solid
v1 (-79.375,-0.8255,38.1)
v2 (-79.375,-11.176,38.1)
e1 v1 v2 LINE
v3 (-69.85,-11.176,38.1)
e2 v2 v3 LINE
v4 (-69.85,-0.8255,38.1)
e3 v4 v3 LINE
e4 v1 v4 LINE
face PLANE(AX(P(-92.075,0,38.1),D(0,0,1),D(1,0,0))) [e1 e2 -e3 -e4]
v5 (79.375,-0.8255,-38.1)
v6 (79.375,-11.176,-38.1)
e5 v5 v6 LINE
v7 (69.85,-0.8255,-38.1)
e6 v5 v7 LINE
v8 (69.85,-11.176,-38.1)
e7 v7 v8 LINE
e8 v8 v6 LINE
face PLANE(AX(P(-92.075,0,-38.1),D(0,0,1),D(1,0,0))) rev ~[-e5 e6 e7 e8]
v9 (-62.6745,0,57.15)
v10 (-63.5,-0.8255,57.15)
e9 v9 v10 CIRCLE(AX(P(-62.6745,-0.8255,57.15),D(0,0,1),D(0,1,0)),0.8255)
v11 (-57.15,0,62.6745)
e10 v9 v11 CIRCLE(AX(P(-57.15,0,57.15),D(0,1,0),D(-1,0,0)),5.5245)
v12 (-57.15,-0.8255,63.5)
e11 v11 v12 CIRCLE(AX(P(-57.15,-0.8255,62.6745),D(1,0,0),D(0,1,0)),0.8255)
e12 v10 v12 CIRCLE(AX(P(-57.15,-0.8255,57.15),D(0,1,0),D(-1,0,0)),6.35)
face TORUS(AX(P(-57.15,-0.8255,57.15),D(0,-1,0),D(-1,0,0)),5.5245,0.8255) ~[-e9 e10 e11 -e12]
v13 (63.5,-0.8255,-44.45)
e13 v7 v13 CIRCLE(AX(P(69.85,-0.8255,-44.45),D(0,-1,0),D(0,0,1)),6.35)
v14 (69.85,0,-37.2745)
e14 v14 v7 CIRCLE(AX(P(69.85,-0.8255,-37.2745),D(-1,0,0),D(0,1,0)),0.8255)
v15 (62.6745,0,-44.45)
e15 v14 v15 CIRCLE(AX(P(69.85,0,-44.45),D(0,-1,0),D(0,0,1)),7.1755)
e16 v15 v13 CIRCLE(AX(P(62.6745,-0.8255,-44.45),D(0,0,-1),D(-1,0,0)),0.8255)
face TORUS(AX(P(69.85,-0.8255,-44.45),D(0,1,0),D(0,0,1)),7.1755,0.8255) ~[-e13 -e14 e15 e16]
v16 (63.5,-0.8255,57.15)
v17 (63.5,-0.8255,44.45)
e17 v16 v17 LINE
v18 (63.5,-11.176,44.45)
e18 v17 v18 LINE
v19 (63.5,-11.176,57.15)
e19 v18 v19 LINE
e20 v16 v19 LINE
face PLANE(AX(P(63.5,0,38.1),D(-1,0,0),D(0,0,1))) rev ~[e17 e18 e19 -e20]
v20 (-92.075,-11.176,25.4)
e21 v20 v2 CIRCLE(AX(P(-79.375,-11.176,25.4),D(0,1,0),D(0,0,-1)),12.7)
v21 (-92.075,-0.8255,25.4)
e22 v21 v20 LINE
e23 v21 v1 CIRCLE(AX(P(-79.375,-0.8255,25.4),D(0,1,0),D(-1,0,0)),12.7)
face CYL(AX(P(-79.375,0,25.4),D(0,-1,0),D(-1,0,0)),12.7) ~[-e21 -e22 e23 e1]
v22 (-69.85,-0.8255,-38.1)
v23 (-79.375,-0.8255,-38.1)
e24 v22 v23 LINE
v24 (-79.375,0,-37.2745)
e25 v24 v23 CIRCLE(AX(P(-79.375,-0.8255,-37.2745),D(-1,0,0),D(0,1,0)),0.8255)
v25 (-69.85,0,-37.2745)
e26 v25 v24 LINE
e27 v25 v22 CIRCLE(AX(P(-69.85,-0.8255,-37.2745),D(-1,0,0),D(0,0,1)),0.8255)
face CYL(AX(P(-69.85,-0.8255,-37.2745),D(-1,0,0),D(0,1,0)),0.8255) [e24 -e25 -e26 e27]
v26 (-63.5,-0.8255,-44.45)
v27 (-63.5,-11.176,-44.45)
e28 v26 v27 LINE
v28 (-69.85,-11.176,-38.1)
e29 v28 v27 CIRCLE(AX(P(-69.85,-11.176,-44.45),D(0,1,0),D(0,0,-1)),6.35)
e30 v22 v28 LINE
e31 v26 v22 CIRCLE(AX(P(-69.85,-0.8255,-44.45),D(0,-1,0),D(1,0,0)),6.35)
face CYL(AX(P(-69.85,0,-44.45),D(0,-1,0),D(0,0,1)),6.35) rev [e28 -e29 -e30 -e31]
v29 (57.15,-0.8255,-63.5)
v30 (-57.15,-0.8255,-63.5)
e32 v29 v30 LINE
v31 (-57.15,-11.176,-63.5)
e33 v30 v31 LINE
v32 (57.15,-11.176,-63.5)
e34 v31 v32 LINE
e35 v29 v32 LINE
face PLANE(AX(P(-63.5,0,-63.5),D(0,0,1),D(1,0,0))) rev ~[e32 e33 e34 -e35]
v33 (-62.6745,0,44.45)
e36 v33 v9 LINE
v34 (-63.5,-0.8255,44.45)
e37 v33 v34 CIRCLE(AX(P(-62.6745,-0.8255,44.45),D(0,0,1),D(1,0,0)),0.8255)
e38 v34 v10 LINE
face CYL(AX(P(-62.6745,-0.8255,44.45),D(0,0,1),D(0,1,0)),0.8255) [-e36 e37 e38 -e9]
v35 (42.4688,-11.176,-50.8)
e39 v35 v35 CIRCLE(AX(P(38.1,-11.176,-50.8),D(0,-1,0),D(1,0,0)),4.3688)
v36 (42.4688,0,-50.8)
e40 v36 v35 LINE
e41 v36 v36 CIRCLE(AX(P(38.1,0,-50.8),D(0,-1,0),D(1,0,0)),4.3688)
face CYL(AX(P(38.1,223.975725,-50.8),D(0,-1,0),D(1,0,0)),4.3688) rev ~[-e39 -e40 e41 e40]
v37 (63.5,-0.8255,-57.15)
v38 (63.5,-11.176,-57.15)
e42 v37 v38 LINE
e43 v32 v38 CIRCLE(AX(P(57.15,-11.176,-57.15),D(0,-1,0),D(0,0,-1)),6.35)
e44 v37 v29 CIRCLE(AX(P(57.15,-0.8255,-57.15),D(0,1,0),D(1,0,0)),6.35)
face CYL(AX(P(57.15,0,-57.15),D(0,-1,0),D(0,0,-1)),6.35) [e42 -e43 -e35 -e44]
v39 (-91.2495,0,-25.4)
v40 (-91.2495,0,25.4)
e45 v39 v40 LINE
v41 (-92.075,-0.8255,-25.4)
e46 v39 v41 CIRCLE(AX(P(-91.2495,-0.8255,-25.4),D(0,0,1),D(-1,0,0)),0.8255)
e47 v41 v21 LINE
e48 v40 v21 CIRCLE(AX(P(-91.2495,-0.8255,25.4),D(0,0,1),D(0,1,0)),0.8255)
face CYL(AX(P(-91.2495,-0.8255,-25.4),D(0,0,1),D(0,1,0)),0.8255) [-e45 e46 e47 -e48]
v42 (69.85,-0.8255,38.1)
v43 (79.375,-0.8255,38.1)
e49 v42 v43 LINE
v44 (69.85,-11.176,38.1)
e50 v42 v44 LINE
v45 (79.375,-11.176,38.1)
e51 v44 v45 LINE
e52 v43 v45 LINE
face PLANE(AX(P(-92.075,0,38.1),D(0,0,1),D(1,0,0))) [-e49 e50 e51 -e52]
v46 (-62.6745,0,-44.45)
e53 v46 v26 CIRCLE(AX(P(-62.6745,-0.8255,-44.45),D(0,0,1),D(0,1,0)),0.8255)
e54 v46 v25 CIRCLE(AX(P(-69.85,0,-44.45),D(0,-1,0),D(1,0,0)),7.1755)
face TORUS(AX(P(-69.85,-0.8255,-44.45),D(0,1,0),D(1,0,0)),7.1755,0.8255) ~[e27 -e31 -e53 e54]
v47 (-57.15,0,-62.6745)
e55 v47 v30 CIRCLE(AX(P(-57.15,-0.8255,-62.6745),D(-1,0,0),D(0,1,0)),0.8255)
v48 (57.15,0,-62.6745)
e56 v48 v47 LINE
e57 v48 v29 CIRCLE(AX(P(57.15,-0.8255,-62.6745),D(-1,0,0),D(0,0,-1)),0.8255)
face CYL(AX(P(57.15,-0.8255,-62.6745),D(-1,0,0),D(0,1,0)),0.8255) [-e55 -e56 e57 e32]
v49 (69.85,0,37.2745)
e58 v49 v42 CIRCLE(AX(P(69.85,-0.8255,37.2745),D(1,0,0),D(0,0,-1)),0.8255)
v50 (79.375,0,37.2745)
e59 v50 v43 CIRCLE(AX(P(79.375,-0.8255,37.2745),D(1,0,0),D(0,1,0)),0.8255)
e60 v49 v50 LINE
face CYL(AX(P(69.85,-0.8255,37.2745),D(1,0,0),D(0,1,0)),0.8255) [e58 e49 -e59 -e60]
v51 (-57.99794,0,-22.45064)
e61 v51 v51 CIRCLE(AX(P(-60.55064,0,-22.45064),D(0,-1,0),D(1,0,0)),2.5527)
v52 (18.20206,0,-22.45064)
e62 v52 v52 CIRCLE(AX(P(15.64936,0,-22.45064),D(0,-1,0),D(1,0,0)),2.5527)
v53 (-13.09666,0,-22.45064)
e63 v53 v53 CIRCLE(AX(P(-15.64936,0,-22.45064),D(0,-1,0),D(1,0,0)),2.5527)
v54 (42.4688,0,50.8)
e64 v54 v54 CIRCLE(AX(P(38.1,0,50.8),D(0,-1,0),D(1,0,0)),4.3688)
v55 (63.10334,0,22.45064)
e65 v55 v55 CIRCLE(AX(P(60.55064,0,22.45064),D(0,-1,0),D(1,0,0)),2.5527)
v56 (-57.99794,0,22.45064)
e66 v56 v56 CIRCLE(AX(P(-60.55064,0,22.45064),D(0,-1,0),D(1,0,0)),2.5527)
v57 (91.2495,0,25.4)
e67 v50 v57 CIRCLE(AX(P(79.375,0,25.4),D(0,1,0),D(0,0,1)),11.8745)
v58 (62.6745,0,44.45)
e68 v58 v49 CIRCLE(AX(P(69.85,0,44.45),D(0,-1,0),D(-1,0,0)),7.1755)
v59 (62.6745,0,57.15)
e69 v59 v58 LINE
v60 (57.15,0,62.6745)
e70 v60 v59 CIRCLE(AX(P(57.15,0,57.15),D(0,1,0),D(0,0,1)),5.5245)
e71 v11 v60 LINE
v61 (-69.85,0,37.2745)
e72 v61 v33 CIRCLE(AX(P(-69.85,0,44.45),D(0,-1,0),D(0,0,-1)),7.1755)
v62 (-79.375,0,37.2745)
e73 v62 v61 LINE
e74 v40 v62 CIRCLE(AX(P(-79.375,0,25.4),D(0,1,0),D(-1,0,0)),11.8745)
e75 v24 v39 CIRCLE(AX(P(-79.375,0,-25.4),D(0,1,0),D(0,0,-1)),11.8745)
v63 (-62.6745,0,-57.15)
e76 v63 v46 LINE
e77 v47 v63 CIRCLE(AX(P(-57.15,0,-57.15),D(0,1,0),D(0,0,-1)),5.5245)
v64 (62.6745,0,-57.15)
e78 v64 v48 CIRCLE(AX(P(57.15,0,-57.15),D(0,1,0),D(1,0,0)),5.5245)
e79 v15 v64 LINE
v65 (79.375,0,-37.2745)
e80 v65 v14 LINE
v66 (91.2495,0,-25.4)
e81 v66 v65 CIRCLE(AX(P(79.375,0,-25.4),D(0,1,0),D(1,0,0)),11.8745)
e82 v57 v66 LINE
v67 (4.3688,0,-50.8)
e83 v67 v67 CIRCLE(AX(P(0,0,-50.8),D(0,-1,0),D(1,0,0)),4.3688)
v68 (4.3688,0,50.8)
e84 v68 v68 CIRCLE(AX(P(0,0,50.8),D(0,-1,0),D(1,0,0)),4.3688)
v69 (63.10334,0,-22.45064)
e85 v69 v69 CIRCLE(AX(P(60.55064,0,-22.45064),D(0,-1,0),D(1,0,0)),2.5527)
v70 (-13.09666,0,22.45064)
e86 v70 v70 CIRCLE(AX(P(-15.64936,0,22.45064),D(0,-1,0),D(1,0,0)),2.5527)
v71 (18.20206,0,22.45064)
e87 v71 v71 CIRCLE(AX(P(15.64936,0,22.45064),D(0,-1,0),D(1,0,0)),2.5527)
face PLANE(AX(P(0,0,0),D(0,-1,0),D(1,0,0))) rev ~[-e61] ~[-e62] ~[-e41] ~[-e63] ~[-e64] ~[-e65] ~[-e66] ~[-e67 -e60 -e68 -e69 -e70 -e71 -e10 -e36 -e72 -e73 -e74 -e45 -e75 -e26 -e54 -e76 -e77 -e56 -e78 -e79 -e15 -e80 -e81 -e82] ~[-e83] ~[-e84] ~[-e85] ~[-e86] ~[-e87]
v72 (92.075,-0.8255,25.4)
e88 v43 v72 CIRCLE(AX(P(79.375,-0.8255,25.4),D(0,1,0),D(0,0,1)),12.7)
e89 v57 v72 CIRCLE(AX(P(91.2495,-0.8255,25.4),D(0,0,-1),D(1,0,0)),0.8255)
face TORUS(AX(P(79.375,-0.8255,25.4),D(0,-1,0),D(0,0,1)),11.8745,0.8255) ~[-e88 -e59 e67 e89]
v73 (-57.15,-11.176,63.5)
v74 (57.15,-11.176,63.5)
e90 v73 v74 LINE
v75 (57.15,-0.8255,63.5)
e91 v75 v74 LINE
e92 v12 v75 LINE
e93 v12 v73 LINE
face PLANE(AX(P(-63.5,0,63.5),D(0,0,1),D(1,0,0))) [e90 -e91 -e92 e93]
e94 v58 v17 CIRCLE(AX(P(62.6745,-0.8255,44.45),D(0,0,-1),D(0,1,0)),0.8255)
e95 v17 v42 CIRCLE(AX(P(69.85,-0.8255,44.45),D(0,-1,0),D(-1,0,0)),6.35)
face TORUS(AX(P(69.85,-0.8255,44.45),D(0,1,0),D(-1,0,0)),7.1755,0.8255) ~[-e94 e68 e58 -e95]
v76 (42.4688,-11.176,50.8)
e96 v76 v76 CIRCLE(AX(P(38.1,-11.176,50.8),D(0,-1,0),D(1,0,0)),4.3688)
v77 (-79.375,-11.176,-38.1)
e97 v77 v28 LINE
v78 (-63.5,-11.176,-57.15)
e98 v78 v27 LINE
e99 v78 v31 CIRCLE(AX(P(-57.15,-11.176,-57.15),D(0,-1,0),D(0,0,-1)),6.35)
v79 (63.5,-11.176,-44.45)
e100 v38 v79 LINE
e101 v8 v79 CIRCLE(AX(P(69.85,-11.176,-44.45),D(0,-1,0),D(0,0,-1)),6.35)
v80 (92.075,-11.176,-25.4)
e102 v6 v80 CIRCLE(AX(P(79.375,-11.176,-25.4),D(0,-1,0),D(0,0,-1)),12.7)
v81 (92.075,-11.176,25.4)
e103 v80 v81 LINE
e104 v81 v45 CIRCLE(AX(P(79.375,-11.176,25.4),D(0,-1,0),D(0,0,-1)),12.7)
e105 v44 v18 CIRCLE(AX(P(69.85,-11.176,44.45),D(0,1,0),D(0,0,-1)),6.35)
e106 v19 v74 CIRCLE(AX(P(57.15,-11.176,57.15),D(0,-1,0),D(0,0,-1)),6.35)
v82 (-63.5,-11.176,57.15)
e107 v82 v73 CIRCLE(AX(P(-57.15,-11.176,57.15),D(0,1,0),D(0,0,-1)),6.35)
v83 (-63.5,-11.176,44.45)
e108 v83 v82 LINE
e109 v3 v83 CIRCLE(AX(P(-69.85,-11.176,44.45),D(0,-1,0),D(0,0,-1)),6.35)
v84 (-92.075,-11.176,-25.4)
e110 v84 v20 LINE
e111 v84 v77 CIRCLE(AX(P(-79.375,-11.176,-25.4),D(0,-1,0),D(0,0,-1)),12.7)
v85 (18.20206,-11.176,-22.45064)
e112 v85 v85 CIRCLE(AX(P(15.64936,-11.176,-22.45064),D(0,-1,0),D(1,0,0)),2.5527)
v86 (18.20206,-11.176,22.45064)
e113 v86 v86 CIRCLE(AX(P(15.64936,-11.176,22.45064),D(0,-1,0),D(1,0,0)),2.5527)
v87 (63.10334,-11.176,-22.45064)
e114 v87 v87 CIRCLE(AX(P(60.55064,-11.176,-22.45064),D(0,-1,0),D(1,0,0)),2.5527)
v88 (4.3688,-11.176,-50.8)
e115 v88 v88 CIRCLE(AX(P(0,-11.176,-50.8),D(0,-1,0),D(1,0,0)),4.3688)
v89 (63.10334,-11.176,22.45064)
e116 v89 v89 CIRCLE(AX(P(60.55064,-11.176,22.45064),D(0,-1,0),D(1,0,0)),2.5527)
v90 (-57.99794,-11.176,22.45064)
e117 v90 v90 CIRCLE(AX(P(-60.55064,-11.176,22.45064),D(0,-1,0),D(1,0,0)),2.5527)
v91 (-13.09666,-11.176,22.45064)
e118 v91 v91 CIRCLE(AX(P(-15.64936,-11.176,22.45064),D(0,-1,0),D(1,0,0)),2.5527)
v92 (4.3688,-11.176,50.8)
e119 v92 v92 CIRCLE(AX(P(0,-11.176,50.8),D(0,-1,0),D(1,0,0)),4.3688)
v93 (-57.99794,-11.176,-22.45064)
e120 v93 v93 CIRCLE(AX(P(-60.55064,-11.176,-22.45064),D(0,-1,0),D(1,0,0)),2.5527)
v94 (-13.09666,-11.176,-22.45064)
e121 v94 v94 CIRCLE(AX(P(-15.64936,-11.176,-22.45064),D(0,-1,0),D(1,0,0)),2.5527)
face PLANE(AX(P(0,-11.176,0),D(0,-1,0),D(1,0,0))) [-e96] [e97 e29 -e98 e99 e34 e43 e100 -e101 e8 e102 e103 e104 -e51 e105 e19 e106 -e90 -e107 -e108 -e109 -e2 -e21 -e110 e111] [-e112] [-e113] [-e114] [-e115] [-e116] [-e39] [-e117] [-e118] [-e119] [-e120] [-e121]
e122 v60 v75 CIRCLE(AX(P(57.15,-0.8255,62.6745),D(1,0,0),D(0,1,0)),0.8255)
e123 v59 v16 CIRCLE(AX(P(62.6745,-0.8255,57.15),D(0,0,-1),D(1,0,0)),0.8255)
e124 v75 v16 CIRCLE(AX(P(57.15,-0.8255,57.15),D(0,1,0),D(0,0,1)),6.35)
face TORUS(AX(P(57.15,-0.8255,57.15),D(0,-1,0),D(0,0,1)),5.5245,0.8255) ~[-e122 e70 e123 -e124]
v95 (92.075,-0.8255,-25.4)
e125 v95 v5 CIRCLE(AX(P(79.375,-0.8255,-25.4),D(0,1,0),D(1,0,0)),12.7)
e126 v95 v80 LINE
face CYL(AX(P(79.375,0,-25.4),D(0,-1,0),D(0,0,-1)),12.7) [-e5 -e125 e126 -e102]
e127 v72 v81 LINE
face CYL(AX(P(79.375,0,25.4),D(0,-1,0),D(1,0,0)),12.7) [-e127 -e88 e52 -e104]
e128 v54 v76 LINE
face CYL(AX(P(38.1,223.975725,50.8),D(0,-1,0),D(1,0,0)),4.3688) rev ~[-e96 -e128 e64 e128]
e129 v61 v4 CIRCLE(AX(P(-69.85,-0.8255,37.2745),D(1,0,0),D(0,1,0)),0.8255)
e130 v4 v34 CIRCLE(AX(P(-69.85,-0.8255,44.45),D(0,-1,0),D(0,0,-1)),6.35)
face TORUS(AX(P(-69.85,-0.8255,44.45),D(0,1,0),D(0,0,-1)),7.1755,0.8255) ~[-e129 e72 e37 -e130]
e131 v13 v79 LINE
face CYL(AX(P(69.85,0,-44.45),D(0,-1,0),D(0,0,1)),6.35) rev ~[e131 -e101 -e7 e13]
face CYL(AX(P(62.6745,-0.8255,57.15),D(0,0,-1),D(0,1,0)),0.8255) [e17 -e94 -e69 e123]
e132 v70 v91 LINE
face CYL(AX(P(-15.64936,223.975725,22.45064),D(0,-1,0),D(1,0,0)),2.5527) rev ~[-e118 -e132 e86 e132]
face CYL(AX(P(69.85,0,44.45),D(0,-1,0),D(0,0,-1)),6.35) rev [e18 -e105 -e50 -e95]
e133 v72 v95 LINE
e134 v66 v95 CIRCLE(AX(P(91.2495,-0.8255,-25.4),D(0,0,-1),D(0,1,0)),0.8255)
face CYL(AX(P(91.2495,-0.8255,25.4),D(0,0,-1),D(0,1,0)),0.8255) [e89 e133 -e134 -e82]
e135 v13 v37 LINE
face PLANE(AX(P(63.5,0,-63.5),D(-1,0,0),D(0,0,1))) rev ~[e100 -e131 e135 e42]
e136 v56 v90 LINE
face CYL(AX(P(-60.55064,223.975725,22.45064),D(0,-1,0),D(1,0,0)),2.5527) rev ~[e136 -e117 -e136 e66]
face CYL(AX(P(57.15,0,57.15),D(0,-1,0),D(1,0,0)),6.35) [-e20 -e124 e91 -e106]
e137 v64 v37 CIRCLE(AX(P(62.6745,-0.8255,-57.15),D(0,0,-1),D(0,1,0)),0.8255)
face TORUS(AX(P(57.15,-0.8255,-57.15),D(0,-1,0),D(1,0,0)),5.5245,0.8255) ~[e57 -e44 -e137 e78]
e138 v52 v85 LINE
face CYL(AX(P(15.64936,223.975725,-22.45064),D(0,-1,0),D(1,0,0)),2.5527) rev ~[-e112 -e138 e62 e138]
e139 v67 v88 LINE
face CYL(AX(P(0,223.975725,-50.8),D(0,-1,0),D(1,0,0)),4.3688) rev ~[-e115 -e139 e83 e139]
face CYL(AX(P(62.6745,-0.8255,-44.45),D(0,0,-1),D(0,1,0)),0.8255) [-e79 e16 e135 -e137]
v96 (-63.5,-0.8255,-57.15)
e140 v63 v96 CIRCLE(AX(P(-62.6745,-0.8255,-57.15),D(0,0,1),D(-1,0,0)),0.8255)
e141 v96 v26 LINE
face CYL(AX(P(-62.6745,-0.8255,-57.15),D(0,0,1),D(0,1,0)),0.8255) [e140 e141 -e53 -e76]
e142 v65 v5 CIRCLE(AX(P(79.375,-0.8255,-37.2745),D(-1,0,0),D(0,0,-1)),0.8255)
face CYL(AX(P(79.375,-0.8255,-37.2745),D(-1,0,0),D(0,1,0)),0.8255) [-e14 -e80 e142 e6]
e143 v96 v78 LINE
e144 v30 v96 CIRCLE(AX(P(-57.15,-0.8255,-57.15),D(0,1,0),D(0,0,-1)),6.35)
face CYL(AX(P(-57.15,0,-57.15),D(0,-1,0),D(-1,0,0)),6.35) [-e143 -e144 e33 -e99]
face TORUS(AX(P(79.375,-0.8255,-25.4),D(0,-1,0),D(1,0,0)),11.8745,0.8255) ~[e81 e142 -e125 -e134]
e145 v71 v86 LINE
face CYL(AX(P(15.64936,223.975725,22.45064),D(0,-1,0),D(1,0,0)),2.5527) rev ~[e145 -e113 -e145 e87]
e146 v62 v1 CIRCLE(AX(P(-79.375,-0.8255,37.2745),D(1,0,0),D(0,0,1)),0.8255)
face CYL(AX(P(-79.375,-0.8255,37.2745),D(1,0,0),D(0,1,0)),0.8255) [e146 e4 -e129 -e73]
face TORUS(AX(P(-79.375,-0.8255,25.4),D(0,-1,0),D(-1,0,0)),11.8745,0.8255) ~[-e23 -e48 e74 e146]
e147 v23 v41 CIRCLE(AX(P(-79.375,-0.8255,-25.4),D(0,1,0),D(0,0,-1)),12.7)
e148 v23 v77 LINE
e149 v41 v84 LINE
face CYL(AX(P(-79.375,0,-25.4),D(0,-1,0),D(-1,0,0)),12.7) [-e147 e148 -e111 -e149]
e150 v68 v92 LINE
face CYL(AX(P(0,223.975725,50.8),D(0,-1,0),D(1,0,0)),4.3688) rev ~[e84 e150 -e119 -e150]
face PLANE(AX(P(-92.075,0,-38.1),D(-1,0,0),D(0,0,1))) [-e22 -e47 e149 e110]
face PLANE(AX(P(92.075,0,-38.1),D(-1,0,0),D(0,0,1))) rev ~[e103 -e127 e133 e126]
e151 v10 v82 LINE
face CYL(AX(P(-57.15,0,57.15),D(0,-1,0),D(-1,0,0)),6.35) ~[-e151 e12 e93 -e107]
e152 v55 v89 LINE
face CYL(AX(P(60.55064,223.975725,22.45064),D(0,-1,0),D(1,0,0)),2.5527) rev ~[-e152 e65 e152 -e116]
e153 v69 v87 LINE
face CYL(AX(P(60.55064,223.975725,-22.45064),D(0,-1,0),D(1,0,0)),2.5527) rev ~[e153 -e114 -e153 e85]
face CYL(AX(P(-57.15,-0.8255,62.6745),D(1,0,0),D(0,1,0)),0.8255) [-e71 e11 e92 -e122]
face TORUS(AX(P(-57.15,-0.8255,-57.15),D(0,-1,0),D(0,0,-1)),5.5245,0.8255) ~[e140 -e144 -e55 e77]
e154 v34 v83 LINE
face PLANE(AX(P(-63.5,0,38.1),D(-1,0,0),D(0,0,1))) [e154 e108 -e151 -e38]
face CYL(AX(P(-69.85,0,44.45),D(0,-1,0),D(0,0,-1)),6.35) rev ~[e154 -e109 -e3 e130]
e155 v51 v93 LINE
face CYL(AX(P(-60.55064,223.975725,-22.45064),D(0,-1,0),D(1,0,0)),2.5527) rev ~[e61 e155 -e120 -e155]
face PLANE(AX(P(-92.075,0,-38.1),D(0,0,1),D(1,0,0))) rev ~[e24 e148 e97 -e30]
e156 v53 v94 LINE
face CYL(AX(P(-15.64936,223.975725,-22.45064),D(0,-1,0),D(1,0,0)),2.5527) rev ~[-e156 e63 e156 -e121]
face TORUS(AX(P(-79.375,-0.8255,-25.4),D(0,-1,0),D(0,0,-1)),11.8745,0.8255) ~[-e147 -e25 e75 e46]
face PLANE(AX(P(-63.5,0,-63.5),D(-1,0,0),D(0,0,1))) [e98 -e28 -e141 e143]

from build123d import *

# Parameters (mm, degrees)
F0_W     = 184.15
F0_H     = 76.2
F1_DEPTH = 11.176
F2_R     = 12.7
F3_W     = 127
F3_H     = 25.4
F4_DEPTH = 11.176
F5_R     = 6.35
F7_D     = 5.1054
F8_R     = 0.8255
F10_D    = 8.7376


# Not quite as in the source:
# - a feature names something its author has since deleted; it is built from what else it names


with BuildPart() as f1:
    # F0 (on Front) → F1 (new body)
    with BuildSketch(Plane.XZ):
        Rectangle(F0_W, F0_H)
    extrude(amount=F1_DEPTH)

    # F2
    f2_edges = [f1.edges().sort_by_distance(p)[0] for p in [
        (92.075, -5.588, 38.1),
        (92.075, -5.588, -38.1),
        (-92.075, -5.588, -38.1),
        (-92.075, -5.588, 38.1),
    ]]
    fillet(f2_edges, radius=F2_R)

    # F3 (on Front) → F4 (join)
    with BuildSketch(Plane.XZ):
        with Locations((0, 50.8)):
            Rectangle(F3_W, F3_H)
        with Locations((0, -50.8)):
            Rectangle(F3_W, F3_H)
    extrude(amount=F4_DEPTH)

    # F5
    f5_edges = [f1.edges().sort_by_distance(p)[0] for p in [
        (-63.5, -5.588, 63.5),
        (-63.5, -5.588, 38.1),
        (63.5, -5.588, 63.5),
        (63.5, -5.588, 38.1),
        (-63.5, -5.588, -63.5),
        (63.5, -5.588, -63.5),
        (63.5, -5.588, -38.1),
        (-63.5, -5.588, -38.1),
    ]]
    fillet(f5_edges, radius=F5_R)

    # F7 (through all)
    with Locations(Plane(origin=(0, 0, 0), x_dir=(-1, 0, 0), z_dir=(0, 1, 0))):
        with Locations((-60.5506403027, 22.4506403027), (-15.6493596973, 22.4506403027), (-60.5506403027, -22.4506403027), (-15.6493596973, -22.4506403027), (15.6493596973, 22.4506403027), (15.6493596973, -22.4506403027), (60.5506403027, 22.4506403027), (60.5506403027, -22.4506403027)):
            Hole(F7_D / 2)

    # F8
    f8_edges = [f1.edges().sort_by_distance(p)[0] for p in [
        (0, 0, 63.5),
    ]]
    fillet(f8_edges, radius=F8_R)

    # F10 (through all)
    with Locations(Plane(origin=(0, 0, 0), x_dir=(-1, 0, 0), z_dir=(0, 1, 0))):
        with Locations((-38.1, 50.8), (0, 50.8), (-38.1, -50.8), (0, -50.8)):
            Hole(F10_D / 2)


solid = f1.part
